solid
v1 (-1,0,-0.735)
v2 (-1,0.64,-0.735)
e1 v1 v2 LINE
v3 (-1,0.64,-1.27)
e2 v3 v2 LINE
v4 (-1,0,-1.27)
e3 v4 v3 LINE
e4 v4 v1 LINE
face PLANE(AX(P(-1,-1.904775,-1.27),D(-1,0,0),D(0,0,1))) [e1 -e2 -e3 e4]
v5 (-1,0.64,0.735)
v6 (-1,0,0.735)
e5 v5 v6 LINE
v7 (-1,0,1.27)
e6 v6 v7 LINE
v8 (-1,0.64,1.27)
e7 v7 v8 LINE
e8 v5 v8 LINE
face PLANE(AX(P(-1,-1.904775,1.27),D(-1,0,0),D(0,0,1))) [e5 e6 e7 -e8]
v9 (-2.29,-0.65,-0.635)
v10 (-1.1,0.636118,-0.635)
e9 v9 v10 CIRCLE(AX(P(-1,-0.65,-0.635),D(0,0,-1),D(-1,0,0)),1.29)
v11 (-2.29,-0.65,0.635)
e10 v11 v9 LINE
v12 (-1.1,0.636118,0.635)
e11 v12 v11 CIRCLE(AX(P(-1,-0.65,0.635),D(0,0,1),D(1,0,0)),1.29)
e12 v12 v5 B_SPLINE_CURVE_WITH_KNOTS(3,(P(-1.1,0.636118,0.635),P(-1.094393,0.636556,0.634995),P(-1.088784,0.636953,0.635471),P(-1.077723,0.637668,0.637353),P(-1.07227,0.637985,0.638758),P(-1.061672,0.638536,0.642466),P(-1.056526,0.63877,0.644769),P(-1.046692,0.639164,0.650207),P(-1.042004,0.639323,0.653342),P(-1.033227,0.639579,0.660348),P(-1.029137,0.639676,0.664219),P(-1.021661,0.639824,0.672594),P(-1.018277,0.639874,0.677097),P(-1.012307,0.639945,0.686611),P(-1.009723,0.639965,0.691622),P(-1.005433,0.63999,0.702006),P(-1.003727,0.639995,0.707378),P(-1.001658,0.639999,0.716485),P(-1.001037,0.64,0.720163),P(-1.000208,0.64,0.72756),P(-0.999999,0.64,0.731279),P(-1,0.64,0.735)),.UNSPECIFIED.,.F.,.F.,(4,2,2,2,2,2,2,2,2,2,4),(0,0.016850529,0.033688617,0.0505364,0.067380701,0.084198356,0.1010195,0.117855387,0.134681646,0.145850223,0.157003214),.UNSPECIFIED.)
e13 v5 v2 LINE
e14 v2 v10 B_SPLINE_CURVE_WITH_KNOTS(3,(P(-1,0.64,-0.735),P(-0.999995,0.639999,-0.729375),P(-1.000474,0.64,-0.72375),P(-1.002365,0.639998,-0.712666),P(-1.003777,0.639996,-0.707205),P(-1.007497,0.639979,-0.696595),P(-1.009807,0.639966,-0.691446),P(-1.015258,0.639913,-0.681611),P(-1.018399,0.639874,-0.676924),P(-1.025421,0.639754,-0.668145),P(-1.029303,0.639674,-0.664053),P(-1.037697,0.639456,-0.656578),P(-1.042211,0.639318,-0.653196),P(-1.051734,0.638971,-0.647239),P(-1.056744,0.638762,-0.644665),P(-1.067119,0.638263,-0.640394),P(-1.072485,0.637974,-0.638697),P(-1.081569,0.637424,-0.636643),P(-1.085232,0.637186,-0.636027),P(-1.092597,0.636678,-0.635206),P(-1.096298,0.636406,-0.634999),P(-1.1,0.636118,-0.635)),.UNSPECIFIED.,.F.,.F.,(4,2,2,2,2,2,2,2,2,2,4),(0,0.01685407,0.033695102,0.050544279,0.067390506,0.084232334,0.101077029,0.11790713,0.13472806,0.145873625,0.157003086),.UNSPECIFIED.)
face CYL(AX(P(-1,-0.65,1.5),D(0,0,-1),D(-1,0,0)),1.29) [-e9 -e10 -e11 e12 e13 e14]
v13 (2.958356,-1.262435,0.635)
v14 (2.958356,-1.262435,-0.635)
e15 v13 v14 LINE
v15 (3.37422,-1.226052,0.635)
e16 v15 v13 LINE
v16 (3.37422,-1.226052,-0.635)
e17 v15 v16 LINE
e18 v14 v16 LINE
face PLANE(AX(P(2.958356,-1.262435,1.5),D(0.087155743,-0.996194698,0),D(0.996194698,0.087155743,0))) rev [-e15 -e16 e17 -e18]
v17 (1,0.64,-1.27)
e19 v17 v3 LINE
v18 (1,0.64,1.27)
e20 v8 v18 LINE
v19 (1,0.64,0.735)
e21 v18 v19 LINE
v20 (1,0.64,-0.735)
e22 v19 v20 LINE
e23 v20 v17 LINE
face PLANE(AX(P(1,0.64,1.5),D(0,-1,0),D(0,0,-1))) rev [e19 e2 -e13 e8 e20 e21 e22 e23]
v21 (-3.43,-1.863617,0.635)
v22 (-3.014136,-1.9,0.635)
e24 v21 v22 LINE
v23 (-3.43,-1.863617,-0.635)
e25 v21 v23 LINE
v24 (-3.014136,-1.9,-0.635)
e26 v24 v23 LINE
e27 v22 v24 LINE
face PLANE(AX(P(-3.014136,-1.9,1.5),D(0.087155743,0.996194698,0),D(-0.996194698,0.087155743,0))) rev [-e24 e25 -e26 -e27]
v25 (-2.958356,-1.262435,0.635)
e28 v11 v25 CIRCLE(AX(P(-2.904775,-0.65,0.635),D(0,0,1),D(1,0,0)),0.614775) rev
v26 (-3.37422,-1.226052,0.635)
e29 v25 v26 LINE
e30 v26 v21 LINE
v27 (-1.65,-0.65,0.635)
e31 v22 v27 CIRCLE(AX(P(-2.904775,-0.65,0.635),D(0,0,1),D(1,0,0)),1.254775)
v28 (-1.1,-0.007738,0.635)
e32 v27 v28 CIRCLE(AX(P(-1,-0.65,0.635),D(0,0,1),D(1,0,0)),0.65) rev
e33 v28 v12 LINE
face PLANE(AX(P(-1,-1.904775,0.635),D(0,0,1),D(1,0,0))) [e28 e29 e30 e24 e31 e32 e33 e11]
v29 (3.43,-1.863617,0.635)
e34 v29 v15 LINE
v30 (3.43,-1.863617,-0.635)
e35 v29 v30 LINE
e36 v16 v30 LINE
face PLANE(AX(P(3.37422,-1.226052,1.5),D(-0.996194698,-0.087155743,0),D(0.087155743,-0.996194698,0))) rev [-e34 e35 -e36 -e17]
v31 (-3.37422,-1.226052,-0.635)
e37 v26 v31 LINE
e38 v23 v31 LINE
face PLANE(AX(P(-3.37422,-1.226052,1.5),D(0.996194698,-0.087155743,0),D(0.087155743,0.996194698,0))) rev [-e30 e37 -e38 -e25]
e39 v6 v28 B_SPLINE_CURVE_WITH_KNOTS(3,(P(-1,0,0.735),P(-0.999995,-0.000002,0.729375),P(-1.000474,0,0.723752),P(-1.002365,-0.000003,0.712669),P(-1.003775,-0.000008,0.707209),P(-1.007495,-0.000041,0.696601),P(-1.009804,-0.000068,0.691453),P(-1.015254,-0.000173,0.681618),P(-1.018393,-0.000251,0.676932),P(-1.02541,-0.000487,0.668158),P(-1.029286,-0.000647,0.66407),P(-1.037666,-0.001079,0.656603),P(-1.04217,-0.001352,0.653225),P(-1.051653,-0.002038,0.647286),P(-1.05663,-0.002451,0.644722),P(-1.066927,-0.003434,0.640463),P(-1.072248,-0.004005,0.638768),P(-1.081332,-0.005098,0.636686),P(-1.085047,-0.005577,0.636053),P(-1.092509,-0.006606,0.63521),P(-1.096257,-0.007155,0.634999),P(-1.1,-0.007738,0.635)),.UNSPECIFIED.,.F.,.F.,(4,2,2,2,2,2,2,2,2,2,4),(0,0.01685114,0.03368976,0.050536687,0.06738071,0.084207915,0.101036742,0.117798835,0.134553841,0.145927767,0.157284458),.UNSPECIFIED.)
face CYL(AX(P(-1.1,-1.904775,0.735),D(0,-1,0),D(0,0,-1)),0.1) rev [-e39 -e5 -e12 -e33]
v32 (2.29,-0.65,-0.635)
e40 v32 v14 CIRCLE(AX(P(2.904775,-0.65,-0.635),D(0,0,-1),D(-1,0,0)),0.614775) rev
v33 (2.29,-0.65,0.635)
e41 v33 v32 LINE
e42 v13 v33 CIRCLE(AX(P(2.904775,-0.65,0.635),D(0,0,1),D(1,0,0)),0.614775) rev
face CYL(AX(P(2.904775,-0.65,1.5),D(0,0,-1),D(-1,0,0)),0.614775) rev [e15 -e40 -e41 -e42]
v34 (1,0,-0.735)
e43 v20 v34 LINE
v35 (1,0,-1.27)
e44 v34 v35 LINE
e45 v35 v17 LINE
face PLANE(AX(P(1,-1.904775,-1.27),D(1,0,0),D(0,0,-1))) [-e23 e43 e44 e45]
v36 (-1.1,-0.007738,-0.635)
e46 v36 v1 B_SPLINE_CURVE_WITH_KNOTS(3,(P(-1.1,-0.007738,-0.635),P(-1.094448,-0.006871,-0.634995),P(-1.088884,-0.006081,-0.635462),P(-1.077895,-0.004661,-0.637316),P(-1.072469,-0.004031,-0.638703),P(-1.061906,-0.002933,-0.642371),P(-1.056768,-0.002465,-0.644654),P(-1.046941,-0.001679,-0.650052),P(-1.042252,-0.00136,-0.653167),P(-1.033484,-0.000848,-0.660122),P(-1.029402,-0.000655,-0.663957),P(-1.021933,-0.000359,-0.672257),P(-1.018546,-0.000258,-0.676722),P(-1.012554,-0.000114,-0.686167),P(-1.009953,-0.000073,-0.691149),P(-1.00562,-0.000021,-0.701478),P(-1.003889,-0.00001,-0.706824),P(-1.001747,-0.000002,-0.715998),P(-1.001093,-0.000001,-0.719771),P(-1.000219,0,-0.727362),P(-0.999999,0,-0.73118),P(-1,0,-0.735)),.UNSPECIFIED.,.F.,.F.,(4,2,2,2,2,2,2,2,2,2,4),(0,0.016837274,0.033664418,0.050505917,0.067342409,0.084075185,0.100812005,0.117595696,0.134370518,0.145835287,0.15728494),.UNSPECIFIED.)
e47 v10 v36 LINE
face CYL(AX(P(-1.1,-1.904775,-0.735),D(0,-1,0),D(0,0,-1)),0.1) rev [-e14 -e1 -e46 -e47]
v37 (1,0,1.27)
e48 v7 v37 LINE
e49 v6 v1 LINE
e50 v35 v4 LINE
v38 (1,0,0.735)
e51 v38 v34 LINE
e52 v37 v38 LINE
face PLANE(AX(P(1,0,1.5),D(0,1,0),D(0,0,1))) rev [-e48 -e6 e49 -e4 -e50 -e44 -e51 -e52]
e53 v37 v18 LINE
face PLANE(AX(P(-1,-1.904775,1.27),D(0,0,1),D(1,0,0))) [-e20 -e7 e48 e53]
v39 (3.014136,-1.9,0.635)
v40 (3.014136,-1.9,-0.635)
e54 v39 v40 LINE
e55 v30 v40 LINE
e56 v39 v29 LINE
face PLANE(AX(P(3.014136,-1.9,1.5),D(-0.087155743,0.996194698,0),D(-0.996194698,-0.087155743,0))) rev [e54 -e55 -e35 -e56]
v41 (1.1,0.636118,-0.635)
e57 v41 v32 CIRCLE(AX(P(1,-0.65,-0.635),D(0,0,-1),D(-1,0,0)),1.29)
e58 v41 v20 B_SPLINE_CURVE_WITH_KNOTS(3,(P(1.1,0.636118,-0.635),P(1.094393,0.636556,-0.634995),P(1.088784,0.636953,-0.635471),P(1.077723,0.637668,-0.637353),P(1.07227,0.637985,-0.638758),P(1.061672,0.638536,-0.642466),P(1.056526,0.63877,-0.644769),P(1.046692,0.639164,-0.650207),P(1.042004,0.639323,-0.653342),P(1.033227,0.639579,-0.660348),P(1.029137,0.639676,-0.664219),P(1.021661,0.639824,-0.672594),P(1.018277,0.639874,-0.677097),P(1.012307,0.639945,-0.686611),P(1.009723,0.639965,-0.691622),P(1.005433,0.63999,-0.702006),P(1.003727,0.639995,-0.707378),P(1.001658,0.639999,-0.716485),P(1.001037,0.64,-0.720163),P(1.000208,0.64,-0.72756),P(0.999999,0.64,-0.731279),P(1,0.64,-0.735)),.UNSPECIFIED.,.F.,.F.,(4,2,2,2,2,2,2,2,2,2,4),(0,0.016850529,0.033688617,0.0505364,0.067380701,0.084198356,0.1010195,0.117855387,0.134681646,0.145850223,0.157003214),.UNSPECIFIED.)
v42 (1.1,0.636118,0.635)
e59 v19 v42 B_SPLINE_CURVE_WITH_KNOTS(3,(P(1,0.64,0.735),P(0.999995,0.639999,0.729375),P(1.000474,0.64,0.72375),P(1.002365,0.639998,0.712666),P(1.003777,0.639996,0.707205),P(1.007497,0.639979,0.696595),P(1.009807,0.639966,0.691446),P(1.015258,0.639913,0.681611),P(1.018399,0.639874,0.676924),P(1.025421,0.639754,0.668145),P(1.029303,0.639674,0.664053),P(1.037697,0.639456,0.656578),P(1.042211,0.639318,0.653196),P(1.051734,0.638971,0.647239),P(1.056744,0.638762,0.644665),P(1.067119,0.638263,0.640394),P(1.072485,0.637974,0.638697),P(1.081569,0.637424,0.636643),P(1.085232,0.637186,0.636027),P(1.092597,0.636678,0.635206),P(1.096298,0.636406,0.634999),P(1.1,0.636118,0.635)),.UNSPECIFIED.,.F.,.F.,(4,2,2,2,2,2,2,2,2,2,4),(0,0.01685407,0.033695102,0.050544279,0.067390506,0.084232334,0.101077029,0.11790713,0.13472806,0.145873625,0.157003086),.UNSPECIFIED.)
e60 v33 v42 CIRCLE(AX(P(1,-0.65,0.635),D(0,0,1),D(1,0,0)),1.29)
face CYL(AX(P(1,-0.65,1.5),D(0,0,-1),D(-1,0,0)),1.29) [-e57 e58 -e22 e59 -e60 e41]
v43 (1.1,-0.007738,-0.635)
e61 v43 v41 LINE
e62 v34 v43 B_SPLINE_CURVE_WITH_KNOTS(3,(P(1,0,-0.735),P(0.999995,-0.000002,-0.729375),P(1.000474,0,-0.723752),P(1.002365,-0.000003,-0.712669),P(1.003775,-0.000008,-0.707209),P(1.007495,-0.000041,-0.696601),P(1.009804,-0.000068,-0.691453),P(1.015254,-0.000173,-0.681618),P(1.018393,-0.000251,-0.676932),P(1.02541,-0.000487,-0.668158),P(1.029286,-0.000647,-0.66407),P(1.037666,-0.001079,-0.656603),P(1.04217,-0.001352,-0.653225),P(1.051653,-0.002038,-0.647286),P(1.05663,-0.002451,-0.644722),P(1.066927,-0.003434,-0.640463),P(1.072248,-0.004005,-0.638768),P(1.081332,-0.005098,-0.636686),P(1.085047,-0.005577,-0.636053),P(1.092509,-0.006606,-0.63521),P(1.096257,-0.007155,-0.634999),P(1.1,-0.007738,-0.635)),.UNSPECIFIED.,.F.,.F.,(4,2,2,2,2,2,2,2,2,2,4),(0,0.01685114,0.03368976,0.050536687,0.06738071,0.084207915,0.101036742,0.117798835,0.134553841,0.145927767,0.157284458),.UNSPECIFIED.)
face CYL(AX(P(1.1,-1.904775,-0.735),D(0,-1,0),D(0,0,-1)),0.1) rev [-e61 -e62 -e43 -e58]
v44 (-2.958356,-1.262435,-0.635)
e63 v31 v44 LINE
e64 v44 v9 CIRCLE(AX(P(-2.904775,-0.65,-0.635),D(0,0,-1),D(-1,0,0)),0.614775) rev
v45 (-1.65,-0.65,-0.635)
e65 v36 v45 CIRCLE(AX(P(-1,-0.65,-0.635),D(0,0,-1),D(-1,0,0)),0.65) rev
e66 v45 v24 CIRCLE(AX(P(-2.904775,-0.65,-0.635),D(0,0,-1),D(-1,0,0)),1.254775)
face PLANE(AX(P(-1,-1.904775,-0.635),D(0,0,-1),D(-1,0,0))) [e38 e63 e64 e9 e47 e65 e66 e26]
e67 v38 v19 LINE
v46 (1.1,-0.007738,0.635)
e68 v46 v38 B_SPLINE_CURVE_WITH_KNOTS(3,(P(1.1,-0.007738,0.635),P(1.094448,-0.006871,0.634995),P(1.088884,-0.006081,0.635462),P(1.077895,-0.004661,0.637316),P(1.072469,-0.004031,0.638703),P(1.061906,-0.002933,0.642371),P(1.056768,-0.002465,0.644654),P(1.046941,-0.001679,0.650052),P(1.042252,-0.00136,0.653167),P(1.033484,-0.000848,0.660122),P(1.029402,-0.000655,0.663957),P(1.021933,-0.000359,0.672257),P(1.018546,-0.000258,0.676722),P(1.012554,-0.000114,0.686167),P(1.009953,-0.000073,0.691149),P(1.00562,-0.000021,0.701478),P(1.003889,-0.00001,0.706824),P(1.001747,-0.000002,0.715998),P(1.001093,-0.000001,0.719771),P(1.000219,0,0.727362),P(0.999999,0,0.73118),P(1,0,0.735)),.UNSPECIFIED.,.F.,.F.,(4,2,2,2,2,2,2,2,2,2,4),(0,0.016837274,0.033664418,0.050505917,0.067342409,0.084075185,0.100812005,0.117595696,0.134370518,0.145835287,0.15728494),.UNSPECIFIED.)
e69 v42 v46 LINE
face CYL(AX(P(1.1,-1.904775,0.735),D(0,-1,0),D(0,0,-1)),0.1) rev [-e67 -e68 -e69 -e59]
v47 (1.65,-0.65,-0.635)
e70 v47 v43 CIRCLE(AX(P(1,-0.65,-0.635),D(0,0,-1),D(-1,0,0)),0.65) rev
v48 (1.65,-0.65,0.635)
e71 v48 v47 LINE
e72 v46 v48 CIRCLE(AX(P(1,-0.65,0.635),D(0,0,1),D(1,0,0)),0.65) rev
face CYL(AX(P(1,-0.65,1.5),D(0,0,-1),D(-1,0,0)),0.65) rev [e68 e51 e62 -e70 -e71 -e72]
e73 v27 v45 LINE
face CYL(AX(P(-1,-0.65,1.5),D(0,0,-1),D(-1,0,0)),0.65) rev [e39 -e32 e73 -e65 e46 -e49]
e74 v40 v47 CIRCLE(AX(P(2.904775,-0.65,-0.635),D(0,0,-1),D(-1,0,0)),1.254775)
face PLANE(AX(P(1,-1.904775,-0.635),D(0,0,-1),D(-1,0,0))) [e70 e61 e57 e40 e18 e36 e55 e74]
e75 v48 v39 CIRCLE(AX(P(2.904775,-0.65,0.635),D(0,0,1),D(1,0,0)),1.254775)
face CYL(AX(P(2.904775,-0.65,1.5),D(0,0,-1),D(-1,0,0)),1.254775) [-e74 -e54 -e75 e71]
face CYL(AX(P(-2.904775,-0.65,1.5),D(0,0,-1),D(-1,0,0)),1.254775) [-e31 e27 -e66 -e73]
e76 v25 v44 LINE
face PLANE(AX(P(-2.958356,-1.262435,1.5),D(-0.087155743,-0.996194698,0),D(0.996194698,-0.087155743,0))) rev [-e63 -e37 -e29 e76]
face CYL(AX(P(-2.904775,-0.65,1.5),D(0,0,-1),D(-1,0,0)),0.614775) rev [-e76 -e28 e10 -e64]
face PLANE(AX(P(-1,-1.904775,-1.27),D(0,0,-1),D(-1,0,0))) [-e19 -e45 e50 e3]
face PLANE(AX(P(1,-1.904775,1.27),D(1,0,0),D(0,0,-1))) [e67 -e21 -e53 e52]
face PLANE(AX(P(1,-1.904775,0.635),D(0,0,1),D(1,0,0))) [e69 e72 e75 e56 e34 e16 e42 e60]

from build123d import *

# Parameters (mm, degrees)
BOSS_EXTRUDE1_DEPTH     = 1.5
CUT_EXTRUDE1_DEPTH      = 5.200365106
CUT_EXTRUDE1_DEPTH_BACK = 5.200365106
SKETCH2_OUTSIDE_W       = 10.442
SKETCH2_OUTSIDE_H       = 6.582
FILLET1_R               = 0.1


with BuildPart() as part:
    # Sketch1 → Boss-Extrude1 (new, symmetric)
    with BuildSketch(Plane.XY):
        with BuildLine():
            Line((1, 0), (-1, 0))
            ThreePointArc((-1, 0), (-1.459619408, -0.190380592), (-1.65, -0.65))
            ThreePointArc((-1.65, -0.65), (-2.057061231, -1.575117021), (-3.014135626, -1.9))
            Line((-3.014135626, -1.9), (-3.43, -1.863616582))
            Line((-3.43, -1.863616582), (-3.374220325, -1.226051975))
            Line((-3.374220325, -1.226051975), (-2.958355951, -1.262435393))
            ThreePointArc((-2.958355951, -1.262435393), (-2.489438964, -1.103259525), (-2.29, -0.65))
            ThreePointArc((-2.29, -0.65), (-1.912167748, 0.262167748), (-1, 0.64))
            Line((-1, 0.64), (1, 0.64))
            ThreePointArc((1, 0.64), (1.912167748, 0.262167748), (2.29, -0.65))
            ThreePointArc((2.29, -0.65), (2.489438964, -1.103259525), (2.958355951, -1.262435393))
            Line((2.958355951, -1.262435393), (3.374220325, -1.226051975))
            Line((3.374220325, -1.226051975), (3.43, -1.863616582))
            Line((3.43, -1.863616582), (3.014135626, -1.9))
            ThreePointArc((3.014135626, -1.9), (2.057061231, -1.575117021), (1.65, -0.65))
            ThreePointArc((1.65, -0.65), (1.459619408, -0.190380592), (1, 0))
        make_face()
    extrude(amount=BOSS_EXTRUDE1_DEPTH, both=True)

    # Sketch2 outside → Cut-Extrude1 (cut, two sides: drawn at the far end of the back side and taken through both)
    with BuildSketch(Plane(origin=(0, 0, 0), x_dir=(1, 0, 0), z_dir=(0, 1, 0)).offset(-CUT_EXTRUDE1_DEPTH_BACK)):
        Rectangle(SKETCH2_OUTSIDE_W, SKETCH2_OUTSIDE_H)
        Polygon((-1, 1.27), (1, 1.27), (1, 0.635), (3.43, 0.635), (3.43, -0.635), (1, -0.635), (1, -1.27), (-1, -1.27), (-1, -0.635), (-3.43, -0.635), (-3.43, 0.635), (-1, 0.635), align=None, mode=Mode.SUBTRACT)
    extrude(amount=CUT_EXTRUDE1_DEPTH + CUT_EXTRUDE1_DEPTH_BACK, mode=Mode.SUBTRACT)

    # Fillet1
    # the kernel refuses this fillet: 0.1 mm, written as the material it adds along each edge
    with BuildSketch(Plane(origin=(1, -0.25, 0.635), x_dir=(1, 0, 0), z_dir=(0, 1, 0))) as fillet1_piece_1_section:
        with BuildLine():
            CenterArc((FILLET1_R, -FILLET1_R), FILLET1_R, 90, 90)
            Line((0, -FILLET1_R), (0, 0))
            Line((0, 0), (FILLET1_R, 0))
        make_face()
    fillet1_piece_1 = extrude(amount=1.14, mode=Mode.PRIVATE)
    fillet1_piece_1 = fillet1_piece_1 - Plane(origin=(1, -0.65, 0.643680782), x_dir=(1, 0, 0), z_dir=(0, 0, 1)) * Cylinder(0.65, 3, mode=Mode.PRIVATE)
    fillet1_piece_1 = fillet1_piece_1 & Plane(origin=(1, -0.65, 0.643680782), x_dir=(0, 1, 0), z_dir=(0, 0, 1)) * Cylinder(1.29, 3, mode=Mode.PRIVATE)
    add(fillet1_piece_1)
    with BuildSketch(Plane(origin=(1, -0.25, -0.635), x_dir=(1, 0, 0), z_dir=(0, 1, 0))) as fillet1_piece_2_section:
        with BuildLine():
            CenterArc((FILLET1_R, FILLET1_R), FILLET1_R, 180, 90)
            Line((0, FILLET1_R), (0, 0))
            Line((0, 0), (FILLET1_R, 0))
        make_face()
    fillet1_piece_2 = extrude(amount=1.14, mode=Mode.PRIVATE)
    fillet1_piece_2 = fillet1_piece_2 - Plane(origin=(1, -0.65, -0.643680782), x_dir=(1, 0, 0), z_dir=(0, 0, 1)) * Cylinder(0.65, 3, mode=Mode.PRIVATE)
    fillet1_piece_2 = fillet1_piece_2 & Plane(origin=(1, -0.65, -0.643680782), x_dir=(0, 1, 0), z_dir=(0, 0, 1)) * Cylinder(1.29, 3, mode=Mode.PRIVATE)
    add(fillet1_piece_2)
    with BuildSketch(Plane(origin=(-1, -0.25, 0.635), x_dir=(0, 0, 1), z_dir=(0, 1, 0))) as fillet1_piece_3_section:
        with BuildLine():
            CenterArc((FILLET1_R, -FILLET1_R), FILLET1_R, 90, 90)
            Line((0, -FILLET1_R), (0, 0))
            Line((0, 0), (FILLET1_R, 0))
        make_face()
    fillet1_piece_3 = extrude(amount=1.14, mode=Mode.PRIVATE)
    fillet1_piece_3 = fillet1_piece_3 - Plane(origin=(-1, -0.65, 0.643680782), x_dir=(0, 1, 0), z_dir=(0, 0, 1)) * Cylinder(0.65, 3, mode=Mode.PRIVATE)
    fillet1_piece_3 = fillet1_piece_3 & Plane(origin=(-1, -0.65, 0.643680782), x_dir=(-1, 0, 0), z_dir=(0, 0, 1)) * Cylinder(1.29, 3, mode=Mode.PRIVATE)
    add(fillet1_piece_3)
    with BuildSketch(Plane(origin=(-1, -0.25, -0.635), x_dir=(0, 0, -1), z_dir=(0, 1, 0))) as fillet1_piece_4_section:
        with BuildLine():
            CenterArc((FILLET1_R, FILLET1_R), FILLET1_R, 180, 90)
            Line((0, FILLET1_R), (0, 0))
            Line((0, 0), (FILLET1_R, 0))
        make_face()
    fillet1_piece_4 = extrude(amount=1.14, mode=Mode.PRIVATE)
    fillet1_piece_4 = fillet1_piece_4 - Plane(origin=(-1, -0.65, -0.643680782), x_dir=(0, 1, 0), z_dir=(0, 0, 1)) * Cylinder(0.65, 3, mode=Mode.PRIVATE)
    fillet1_piece_4 = fillet1_piece_4 & Plane(origin=(-1, -0.65, -0.643680782), x_dir=(-1, 0, 0), z_dir=(0, 0, 1)) * Cylinder(1.29, 3, mode=Mode.PRIVATE)
    add(fillet1_piece_4)


solid = part.part
